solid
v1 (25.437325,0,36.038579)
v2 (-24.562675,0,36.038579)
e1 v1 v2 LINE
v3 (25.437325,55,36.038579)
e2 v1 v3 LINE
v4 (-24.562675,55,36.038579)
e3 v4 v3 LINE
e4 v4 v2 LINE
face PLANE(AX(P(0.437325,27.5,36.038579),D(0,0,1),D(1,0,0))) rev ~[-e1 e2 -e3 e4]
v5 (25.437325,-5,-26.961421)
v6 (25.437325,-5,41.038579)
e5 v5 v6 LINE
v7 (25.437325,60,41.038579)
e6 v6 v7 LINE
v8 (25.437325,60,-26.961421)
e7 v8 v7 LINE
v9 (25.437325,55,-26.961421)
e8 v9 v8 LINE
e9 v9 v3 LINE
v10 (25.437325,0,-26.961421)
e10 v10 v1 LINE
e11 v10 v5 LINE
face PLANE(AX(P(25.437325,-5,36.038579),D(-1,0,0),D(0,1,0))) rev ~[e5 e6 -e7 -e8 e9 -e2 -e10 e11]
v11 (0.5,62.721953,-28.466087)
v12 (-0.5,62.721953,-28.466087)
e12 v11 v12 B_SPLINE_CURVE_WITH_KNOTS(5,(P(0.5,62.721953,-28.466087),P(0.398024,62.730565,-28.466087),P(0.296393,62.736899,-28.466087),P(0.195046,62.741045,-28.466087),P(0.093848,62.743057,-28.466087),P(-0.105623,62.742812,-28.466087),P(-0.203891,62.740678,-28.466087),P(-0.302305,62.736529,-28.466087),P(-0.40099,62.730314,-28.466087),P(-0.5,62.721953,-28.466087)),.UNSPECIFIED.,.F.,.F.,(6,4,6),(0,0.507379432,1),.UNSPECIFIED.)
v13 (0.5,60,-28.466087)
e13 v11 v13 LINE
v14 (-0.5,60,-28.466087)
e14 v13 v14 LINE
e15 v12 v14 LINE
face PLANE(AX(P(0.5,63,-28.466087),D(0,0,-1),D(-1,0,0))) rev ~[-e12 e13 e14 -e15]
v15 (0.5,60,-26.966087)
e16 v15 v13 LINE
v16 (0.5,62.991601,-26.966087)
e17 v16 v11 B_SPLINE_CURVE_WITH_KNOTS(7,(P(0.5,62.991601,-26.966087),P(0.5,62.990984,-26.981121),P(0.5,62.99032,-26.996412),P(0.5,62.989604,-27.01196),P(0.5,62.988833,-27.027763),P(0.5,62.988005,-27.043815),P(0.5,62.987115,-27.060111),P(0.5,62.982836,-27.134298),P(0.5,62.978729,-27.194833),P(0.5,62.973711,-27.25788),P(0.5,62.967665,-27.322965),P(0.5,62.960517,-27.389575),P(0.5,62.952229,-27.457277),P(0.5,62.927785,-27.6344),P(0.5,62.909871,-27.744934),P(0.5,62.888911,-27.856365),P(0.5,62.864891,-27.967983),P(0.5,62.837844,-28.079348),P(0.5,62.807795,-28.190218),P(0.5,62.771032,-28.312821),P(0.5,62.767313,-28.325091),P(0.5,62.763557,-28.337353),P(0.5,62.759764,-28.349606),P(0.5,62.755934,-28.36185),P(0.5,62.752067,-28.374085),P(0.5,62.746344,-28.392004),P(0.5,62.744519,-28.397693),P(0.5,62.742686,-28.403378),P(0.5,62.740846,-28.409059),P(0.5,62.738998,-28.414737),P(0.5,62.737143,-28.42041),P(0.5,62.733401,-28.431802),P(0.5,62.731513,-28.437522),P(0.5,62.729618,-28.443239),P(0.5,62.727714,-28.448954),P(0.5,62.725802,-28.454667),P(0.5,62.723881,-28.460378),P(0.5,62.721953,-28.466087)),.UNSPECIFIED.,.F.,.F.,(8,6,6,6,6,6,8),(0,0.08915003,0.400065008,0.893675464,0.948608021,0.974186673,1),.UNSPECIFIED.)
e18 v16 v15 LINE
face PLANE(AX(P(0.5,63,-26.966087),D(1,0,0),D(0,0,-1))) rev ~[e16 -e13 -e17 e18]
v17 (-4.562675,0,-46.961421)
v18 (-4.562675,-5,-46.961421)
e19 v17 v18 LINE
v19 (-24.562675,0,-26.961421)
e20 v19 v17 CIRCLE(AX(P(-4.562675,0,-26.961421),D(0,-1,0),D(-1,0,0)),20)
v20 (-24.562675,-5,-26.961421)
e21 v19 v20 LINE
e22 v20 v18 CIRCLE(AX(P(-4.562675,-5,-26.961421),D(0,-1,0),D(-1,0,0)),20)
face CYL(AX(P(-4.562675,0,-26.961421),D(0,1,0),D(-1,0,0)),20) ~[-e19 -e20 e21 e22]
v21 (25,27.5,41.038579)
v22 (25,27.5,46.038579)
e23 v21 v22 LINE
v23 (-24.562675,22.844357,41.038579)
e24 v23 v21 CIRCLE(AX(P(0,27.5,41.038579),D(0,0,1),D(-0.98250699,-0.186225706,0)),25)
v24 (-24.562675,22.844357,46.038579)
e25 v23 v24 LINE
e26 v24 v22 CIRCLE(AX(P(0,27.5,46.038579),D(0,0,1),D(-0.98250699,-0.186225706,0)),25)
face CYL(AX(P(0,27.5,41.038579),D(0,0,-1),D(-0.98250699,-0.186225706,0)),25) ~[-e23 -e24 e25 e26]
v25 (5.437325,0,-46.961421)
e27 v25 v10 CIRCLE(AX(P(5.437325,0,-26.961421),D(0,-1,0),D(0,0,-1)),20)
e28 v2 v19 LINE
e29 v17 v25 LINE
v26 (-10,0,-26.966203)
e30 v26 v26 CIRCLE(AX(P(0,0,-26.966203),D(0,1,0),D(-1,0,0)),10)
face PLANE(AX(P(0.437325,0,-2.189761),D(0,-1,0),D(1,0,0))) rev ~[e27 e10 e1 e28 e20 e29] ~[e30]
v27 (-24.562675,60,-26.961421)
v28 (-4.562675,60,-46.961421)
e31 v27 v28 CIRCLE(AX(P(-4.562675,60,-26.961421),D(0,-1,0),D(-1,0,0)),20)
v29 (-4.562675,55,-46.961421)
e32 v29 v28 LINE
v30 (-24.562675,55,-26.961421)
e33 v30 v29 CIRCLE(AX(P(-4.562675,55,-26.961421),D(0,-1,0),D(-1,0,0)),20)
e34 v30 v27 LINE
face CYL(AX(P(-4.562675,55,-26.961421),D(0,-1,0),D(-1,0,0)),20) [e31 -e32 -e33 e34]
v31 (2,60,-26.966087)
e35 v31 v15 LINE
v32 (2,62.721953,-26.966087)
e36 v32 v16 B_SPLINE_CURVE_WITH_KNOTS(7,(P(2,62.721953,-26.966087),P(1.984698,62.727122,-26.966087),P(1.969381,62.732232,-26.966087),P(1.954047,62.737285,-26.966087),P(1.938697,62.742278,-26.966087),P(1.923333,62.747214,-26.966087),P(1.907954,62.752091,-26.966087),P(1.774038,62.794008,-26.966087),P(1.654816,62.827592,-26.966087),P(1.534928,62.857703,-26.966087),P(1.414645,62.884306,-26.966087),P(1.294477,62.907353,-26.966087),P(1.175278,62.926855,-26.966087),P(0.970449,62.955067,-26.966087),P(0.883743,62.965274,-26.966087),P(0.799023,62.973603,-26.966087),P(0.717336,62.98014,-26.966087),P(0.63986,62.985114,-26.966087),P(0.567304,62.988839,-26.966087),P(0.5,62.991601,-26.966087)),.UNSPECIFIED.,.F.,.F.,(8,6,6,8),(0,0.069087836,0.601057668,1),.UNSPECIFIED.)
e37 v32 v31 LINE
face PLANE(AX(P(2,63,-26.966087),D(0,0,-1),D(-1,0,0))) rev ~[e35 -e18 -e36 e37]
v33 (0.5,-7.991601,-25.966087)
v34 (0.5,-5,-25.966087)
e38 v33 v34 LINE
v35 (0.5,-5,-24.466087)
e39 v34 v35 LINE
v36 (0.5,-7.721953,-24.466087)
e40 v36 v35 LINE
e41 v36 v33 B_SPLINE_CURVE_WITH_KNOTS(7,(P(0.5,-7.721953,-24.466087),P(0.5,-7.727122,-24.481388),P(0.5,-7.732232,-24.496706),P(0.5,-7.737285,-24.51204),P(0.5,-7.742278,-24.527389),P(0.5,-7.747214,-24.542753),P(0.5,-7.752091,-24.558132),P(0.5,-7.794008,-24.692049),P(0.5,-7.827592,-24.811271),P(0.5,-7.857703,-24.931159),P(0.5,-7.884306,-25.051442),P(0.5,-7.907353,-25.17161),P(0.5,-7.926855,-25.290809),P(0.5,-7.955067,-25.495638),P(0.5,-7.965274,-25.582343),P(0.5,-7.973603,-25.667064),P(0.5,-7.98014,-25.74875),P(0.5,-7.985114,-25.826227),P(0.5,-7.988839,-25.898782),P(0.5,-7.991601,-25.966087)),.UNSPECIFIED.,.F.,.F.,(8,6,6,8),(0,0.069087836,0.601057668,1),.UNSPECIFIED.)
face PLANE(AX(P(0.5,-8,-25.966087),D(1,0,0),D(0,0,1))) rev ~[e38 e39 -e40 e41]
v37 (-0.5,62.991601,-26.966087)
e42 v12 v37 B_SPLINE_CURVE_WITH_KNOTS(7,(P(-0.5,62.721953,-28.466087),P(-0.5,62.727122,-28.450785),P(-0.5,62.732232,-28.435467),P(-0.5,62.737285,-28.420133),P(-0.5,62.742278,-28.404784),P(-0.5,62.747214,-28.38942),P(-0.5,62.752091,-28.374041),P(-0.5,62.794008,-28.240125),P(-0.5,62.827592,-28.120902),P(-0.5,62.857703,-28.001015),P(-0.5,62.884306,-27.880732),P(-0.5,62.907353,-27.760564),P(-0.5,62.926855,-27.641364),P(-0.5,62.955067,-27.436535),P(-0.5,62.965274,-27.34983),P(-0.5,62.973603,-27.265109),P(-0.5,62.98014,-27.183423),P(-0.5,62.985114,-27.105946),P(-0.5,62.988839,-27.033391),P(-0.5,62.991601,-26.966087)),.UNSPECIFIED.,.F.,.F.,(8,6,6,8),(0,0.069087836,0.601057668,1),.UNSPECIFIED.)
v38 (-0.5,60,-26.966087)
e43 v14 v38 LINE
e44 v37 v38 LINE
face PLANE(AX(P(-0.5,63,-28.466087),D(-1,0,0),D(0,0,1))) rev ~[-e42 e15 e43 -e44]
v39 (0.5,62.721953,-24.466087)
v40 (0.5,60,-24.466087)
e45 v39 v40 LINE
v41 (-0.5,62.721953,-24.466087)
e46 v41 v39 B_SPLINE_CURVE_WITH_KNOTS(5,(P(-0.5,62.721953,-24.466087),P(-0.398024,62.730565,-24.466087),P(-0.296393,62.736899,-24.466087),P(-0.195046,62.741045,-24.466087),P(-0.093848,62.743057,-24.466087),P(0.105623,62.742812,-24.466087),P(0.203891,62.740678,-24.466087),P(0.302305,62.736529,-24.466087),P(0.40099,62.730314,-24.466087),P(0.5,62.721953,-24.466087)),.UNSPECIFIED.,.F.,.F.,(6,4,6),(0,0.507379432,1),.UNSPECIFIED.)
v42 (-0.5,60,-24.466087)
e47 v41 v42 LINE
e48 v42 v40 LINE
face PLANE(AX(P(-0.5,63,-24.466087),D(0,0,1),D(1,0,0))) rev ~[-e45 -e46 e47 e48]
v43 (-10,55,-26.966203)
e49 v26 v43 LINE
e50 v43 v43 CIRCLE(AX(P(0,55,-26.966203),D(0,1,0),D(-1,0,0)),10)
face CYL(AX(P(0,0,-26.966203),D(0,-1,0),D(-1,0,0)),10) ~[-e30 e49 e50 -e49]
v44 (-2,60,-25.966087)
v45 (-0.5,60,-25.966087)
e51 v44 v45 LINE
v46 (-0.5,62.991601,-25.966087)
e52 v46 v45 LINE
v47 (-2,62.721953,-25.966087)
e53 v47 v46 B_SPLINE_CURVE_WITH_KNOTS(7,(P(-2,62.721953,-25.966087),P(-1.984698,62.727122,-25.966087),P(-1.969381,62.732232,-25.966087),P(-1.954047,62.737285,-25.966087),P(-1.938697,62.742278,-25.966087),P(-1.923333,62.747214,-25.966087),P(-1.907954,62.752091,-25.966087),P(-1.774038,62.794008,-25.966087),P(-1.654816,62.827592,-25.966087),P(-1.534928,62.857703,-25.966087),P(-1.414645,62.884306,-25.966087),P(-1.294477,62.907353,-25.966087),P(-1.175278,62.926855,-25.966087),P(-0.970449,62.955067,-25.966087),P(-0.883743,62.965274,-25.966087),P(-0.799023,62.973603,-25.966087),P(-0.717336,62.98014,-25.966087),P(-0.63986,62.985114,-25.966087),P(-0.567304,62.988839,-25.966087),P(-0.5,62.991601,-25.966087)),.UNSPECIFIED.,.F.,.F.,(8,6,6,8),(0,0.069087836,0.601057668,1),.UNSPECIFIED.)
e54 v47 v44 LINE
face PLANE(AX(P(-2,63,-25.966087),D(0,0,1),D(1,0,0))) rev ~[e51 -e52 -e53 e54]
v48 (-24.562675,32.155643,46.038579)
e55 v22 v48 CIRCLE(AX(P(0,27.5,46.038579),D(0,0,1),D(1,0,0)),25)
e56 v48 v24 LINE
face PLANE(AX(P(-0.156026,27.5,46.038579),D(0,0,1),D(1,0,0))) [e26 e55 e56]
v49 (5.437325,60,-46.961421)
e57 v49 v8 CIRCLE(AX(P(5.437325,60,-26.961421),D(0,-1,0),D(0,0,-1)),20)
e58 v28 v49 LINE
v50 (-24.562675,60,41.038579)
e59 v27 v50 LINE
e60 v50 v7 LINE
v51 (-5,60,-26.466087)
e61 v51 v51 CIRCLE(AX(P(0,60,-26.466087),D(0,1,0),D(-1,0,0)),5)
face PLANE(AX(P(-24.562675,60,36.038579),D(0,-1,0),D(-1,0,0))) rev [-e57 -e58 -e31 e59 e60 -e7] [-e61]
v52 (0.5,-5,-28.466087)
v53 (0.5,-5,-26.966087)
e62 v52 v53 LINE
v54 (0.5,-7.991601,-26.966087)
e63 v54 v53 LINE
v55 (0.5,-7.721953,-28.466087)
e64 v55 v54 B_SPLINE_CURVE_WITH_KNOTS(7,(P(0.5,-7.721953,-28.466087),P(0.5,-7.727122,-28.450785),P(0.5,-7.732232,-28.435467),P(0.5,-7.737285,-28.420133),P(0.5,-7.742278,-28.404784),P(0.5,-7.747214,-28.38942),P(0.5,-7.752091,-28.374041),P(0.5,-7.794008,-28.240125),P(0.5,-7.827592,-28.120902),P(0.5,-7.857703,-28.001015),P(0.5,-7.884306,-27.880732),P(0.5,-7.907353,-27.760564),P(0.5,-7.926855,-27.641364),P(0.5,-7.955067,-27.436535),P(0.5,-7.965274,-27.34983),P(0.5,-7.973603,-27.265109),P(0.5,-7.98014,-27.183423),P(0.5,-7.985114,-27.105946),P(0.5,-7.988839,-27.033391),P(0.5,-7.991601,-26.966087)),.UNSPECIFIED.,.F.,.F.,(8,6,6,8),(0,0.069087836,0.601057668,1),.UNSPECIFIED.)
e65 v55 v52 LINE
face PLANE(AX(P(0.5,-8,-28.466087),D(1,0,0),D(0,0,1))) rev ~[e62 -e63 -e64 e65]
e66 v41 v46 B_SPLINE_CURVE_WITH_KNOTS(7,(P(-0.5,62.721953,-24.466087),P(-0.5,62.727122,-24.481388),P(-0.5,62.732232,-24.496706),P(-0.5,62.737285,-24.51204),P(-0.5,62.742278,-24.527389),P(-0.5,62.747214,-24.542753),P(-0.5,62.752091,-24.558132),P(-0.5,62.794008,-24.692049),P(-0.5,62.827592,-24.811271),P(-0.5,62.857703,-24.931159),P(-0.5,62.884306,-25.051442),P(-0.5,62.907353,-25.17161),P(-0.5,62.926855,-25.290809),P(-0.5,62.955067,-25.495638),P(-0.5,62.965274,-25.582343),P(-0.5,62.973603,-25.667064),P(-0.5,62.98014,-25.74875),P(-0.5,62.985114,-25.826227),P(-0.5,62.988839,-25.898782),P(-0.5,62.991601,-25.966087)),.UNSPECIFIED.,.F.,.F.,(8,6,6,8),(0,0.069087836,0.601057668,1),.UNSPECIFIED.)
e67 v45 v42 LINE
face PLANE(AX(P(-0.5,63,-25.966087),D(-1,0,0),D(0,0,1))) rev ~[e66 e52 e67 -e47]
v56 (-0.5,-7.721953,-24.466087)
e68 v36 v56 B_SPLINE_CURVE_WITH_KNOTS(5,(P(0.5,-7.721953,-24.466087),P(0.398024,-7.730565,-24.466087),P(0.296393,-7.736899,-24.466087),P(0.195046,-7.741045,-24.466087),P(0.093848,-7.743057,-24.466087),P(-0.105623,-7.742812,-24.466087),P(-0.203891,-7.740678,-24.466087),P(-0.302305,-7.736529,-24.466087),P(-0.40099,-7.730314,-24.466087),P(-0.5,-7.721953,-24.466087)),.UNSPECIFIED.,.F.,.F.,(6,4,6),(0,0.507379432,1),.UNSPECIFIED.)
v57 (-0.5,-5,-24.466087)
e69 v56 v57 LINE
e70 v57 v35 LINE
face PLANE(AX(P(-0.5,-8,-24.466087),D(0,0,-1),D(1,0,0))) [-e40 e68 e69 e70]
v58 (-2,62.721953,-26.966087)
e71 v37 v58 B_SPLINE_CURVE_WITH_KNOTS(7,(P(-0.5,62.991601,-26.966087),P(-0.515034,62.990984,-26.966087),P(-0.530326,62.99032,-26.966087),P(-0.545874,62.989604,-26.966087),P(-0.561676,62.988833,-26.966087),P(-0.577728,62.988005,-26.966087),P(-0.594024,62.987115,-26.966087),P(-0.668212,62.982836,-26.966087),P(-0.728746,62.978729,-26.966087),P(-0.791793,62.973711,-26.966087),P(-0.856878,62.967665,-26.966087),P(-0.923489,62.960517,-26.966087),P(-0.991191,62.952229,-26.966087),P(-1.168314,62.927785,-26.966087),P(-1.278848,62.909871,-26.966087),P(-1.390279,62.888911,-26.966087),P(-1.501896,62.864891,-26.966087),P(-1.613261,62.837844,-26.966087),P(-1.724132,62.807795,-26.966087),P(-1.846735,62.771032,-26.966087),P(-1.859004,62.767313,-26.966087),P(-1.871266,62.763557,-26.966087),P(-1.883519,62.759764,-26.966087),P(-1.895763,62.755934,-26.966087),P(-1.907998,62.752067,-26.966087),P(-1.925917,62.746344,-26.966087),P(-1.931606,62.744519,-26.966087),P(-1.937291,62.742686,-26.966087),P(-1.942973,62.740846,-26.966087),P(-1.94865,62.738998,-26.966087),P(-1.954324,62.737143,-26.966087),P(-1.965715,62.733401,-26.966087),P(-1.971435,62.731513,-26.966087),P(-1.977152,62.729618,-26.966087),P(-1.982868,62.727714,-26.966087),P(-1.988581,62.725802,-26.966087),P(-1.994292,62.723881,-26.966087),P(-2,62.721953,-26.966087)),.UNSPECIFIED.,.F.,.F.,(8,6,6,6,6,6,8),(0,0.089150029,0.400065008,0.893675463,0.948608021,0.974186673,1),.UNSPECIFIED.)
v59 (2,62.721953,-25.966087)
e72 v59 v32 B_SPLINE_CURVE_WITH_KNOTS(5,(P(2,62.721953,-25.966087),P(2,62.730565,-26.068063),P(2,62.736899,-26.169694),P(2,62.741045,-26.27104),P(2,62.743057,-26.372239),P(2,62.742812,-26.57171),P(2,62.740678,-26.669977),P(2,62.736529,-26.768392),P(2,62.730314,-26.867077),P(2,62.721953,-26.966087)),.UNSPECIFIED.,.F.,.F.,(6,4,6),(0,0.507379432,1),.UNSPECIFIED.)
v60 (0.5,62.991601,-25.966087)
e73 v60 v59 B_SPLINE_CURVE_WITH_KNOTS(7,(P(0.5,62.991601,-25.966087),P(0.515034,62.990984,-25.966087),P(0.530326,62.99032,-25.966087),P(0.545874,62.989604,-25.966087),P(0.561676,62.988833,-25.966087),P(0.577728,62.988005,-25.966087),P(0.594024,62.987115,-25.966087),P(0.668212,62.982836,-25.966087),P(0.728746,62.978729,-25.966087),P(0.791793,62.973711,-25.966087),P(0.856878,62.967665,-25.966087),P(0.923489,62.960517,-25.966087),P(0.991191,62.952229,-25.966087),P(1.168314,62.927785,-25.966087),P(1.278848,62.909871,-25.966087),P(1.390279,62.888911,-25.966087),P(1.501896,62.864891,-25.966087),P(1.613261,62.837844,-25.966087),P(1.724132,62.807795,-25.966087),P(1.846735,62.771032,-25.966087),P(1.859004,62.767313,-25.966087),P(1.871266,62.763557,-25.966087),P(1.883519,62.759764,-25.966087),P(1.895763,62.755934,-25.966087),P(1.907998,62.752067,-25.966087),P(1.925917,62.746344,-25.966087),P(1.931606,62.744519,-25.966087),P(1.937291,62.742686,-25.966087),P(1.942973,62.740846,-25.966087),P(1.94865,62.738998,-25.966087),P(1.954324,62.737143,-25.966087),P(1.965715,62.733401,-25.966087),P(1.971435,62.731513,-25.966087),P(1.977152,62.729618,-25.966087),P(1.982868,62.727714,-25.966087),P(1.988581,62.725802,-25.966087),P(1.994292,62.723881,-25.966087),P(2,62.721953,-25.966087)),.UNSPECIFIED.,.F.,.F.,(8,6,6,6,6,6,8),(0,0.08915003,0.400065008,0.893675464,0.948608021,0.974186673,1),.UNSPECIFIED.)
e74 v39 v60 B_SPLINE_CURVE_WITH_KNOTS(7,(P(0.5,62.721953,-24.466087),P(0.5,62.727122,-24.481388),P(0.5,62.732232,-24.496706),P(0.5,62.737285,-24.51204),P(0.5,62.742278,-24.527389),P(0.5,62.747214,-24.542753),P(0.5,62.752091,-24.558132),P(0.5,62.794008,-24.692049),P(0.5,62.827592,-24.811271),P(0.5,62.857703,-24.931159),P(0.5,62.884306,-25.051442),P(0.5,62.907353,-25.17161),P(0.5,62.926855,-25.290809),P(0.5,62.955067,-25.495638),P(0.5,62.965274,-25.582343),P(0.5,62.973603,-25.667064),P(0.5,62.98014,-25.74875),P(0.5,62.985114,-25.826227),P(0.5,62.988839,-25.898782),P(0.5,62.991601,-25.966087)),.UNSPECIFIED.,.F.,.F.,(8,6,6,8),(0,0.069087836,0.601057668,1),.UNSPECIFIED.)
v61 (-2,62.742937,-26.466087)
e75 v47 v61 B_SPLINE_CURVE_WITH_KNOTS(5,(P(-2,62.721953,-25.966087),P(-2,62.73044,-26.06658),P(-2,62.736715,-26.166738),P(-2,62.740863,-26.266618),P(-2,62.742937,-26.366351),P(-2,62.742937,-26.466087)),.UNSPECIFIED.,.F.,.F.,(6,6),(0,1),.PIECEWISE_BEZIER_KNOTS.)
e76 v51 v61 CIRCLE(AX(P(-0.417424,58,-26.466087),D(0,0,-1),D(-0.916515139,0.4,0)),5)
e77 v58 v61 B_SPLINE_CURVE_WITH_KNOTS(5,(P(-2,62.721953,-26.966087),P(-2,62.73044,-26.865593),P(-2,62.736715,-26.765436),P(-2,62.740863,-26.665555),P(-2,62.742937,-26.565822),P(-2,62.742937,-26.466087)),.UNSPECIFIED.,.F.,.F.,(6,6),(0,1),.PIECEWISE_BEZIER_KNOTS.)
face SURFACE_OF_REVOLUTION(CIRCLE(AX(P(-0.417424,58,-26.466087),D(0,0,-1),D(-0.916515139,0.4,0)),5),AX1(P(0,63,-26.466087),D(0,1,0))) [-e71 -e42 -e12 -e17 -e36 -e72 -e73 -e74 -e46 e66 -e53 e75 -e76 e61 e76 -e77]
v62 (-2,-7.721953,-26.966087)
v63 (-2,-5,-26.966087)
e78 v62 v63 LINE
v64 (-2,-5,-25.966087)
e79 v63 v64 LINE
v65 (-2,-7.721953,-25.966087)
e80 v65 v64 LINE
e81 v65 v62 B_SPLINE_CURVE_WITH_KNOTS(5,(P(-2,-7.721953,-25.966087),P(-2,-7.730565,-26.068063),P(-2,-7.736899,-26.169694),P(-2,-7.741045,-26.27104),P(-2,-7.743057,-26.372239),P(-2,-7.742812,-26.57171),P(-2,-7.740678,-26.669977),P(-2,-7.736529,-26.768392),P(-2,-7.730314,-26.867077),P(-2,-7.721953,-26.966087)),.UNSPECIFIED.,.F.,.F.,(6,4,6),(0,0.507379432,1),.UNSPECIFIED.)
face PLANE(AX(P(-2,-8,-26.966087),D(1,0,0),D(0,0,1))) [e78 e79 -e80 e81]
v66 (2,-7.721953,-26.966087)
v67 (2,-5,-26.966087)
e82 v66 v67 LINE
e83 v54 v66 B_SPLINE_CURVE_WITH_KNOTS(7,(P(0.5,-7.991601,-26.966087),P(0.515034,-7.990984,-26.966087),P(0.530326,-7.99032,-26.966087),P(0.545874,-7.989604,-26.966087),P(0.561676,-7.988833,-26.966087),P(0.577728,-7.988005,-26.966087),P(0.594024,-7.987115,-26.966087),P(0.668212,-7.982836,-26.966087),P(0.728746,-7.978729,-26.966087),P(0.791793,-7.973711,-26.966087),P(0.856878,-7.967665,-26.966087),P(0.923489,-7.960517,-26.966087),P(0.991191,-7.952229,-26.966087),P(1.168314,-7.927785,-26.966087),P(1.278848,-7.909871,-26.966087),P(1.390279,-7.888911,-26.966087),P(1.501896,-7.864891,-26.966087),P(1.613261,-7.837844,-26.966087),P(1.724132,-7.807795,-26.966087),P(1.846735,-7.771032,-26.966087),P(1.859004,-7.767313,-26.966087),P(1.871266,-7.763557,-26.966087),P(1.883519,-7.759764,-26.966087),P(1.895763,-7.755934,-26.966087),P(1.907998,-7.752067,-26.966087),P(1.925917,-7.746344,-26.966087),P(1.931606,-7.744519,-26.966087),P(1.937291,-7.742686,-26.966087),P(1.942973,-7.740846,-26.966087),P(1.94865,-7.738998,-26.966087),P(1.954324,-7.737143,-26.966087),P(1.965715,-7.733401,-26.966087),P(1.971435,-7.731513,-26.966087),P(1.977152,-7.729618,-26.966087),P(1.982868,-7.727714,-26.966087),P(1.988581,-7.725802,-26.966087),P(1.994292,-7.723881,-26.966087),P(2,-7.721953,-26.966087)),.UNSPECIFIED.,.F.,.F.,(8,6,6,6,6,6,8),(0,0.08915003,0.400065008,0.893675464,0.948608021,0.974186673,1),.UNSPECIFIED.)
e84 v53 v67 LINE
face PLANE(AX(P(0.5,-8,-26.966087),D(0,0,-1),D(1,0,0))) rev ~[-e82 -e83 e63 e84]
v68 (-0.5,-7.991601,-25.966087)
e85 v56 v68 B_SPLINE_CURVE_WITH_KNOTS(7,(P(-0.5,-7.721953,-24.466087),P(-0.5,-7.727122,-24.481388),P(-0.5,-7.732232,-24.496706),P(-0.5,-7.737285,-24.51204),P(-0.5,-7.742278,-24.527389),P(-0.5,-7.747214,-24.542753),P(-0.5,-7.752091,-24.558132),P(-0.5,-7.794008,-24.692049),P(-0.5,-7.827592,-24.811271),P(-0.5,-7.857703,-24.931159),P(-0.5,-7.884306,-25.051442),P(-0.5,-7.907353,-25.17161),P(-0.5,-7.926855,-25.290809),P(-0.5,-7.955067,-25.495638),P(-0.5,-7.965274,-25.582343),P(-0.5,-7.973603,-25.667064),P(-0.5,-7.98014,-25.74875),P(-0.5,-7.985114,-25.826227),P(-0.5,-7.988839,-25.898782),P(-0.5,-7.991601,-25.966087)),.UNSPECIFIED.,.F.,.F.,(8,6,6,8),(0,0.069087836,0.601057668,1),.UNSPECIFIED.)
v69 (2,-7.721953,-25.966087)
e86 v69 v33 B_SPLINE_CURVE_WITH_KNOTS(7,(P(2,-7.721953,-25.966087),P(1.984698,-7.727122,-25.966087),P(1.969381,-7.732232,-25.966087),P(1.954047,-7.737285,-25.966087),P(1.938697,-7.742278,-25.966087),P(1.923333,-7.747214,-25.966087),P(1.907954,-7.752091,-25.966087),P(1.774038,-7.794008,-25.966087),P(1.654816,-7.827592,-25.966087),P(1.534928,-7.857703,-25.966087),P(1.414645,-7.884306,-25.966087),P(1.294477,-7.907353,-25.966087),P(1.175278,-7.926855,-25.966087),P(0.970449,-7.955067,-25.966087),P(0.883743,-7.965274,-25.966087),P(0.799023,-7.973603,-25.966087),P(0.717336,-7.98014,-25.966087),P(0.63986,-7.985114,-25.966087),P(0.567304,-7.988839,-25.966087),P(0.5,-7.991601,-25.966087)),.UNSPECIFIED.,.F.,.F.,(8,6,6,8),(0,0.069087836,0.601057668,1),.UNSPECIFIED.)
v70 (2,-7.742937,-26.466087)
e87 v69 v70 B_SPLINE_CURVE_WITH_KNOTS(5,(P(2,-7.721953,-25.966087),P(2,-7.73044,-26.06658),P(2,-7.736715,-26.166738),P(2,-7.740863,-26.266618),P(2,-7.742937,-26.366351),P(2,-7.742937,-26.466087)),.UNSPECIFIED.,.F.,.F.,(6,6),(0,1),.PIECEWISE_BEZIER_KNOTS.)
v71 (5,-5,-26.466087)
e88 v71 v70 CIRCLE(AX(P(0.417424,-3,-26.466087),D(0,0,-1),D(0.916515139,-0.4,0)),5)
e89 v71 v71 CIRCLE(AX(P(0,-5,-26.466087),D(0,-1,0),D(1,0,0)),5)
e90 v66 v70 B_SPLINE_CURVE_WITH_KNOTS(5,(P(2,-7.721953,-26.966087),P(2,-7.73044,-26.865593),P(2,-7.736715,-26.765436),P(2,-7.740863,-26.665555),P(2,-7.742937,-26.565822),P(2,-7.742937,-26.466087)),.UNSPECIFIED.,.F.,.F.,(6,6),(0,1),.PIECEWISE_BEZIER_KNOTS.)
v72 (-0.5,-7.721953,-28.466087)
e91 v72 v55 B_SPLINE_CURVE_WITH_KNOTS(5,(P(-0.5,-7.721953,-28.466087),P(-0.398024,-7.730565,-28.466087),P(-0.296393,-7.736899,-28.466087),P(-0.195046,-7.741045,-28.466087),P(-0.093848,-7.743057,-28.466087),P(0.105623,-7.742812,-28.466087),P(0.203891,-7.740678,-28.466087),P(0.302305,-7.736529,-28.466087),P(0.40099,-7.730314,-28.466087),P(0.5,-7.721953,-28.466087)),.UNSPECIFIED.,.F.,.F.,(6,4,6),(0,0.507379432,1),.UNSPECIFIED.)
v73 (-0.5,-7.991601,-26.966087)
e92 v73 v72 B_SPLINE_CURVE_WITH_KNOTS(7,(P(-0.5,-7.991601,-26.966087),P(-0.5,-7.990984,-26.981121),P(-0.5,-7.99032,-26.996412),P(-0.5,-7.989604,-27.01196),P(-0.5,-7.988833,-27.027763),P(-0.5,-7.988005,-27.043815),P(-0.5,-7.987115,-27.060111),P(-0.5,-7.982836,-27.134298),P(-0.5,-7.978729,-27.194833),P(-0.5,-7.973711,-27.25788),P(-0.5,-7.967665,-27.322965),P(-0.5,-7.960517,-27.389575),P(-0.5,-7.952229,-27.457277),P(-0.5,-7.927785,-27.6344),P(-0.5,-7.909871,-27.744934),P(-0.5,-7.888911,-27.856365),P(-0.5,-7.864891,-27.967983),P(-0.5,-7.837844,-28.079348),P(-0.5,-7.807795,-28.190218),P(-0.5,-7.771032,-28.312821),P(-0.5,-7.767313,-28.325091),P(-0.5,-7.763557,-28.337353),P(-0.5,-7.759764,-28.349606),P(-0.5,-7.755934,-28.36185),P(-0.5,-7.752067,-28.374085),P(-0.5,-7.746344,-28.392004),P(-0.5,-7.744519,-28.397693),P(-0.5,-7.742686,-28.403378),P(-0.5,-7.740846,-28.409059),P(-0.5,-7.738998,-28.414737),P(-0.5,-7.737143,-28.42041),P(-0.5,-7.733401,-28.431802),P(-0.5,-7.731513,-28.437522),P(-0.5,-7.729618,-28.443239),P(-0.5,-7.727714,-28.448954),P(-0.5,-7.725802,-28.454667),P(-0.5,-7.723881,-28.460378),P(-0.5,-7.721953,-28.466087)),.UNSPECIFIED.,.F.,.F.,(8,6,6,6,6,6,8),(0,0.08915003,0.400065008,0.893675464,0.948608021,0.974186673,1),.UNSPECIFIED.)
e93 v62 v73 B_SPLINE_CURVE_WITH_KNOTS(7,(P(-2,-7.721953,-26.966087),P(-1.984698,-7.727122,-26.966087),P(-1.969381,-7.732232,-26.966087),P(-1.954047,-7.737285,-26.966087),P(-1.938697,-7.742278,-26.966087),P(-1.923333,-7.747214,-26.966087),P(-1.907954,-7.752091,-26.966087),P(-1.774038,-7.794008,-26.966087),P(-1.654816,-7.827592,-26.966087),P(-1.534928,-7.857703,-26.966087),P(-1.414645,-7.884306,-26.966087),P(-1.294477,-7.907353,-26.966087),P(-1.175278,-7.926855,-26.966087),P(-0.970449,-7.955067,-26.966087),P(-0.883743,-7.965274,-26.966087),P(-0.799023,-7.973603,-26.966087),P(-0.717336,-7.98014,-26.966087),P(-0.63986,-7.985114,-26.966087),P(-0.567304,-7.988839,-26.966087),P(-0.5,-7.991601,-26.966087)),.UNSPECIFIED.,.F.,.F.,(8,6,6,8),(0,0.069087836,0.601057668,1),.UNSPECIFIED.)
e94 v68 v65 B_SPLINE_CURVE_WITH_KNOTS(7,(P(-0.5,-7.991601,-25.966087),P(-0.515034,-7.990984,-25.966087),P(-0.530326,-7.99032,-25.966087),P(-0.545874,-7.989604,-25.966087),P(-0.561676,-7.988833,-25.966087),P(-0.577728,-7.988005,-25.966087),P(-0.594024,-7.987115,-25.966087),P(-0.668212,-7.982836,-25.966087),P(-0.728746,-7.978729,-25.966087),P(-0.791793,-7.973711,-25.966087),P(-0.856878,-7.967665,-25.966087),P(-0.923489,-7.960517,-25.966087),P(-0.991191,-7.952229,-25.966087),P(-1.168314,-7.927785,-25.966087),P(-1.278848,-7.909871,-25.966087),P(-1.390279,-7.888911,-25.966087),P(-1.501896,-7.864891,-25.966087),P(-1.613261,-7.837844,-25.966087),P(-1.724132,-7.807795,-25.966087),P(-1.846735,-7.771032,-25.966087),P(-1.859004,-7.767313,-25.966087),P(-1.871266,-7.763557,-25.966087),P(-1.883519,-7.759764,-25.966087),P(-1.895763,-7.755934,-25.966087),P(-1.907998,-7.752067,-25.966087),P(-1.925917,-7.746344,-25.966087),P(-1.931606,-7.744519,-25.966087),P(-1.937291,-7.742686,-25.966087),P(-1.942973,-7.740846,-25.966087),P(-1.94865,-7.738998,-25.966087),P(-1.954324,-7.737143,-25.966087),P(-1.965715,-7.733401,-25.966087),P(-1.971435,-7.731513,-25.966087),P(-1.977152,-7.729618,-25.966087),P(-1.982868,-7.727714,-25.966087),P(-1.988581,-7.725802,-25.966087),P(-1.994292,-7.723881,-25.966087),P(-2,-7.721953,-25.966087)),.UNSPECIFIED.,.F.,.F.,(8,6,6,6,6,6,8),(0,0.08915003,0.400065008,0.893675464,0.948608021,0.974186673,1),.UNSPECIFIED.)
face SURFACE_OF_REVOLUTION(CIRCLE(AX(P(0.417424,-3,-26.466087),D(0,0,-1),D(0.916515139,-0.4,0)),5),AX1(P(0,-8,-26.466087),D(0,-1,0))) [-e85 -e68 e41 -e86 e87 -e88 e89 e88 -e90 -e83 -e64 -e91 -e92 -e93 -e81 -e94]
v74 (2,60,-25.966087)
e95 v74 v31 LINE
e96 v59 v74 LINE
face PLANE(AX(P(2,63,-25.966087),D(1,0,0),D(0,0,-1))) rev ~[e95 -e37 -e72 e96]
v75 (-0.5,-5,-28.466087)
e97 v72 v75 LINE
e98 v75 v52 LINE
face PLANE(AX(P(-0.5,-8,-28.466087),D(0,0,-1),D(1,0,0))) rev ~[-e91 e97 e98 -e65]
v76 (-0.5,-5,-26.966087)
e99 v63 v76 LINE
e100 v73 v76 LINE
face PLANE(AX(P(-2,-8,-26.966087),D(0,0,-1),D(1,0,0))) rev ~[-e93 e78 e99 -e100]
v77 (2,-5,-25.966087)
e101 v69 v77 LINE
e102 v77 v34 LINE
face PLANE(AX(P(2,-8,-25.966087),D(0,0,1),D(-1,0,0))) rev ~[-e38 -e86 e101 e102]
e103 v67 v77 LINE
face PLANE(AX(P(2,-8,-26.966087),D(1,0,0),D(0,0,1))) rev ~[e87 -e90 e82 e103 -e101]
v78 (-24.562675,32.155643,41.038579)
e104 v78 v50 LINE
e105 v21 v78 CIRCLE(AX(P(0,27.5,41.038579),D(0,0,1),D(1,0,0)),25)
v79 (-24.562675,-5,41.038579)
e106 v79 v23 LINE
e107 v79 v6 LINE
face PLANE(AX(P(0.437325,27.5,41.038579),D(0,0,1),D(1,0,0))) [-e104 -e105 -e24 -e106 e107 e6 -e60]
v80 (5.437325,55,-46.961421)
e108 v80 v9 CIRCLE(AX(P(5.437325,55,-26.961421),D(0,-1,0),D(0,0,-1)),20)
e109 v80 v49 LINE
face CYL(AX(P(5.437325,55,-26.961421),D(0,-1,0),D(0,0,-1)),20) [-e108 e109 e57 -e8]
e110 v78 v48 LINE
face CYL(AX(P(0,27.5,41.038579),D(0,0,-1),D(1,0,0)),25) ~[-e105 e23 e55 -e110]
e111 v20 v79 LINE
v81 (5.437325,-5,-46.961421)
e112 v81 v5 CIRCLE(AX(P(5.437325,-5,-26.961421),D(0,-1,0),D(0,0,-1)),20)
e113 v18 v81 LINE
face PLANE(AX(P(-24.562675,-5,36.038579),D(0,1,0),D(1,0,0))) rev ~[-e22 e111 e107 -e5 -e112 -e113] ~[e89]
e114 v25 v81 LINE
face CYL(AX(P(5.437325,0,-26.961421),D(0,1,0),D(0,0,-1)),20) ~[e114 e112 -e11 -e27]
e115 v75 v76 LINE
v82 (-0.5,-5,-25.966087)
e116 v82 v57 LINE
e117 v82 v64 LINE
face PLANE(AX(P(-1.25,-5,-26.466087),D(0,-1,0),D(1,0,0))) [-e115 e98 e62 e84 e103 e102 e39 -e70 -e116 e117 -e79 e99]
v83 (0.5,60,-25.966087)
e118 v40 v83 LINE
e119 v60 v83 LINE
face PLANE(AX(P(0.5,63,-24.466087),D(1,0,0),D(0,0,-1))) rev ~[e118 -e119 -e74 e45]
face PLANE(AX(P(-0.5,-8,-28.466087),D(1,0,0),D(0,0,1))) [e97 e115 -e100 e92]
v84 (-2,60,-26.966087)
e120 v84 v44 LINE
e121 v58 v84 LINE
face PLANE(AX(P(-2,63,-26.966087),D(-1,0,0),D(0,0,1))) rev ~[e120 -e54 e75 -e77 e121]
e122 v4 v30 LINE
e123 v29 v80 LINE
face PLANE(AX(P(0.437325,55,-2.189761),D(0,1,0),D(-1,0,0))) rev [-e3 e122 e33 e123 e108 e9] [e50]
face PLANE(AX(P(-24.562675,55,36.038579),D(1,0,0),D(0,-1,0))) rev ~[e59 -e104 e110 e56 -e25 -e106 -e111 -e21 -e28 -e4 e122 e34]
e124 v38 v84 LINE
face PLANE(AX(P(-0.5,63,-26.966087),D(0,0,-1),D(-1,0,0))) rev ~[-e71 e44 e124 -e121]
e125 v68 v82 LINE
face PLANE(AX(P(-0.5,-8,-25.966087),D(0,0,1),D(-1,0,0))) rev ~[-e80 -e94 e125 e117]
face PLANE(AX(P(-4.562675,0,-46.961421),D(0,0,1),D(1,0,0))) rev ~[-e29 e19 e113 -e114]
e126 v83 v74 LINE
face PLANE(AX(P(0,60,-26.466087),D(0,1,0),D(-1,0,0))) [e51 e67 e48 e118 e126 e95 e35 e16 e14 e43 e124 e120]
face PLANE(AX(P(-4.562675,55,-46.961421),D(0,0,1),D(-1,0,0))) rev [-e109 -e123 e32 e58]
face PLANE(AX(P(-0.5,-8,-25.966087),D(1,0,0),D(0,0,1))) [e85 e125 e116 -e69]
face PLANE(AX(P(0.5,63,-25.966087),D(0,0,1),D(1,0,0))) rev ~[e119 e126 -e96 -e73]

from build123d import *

# Parameters (mm, degrees)
F1_DEPTH  = 5
F2_W      = 50
F2_H      = 55
F2_H_2    = 5
F3_DEPTH  = 5
F7_DEPTH  = 5
F8_R      = 10
F9_DEPTH  = 55
F10_R     = 5
F11_DEPTH = 3
F12_W     = 1.5
F12_H     = 1
F12_W_2   = 1
F12_H_2   = 1.5
F14_DEPTH = 3
F15_R     = 5
F16_DEPTH = 3
F18_DEPTH = 3


# Not quite as in the source:
# - a fillet or chamfer that OpenCascade refuses, or shapes differently, is made with other operations: its cross-section is extruded or revolved along the edge and cut away or added


with BuildPart() as f1:
    # F0 (on Front) → F1 (new body)
    with BuildSketch(Plane.XZ):
        with BuildLine():
            Line((25.4373252392, 36.0385786295), (-24.5626747608, 36.0385786295))
            Line((-24.5626747608, 36.0385786295), (-24.5626747608, -26.9614213705))
            ThreePointArc((-24.5626747608, -26.9614213705), (-18.7048103845, -41.1035569942), (-4.5626747608, -46.9614213705))
            Line((-4.5626747608, -46.9614213705), (5.4373252392, -46.9614213705))
            ThreePointArc((5.4373252392, -46.9614213705), (19.5794608629, -41.1035569942), (25.4373252392, -26.9614213705))
            Line((25.4373252392, -26.9614213705), (25.4373252392, 36.0385786295))
        make_face()
    extrude(amount=F1_DEPTH)

    # F2 (on face) → F3 (join)
    with BuildSketch(Plane.XY.offset(36.0385786295)):
        with Locations((0.4373252392, 27.5)):
            Rectangle(F2_W, F2_H)
        with Locations((0.4373252392, -2.5)):
            Rectangle(F2_W, F2_H_2)
    extrude(amount=F3_DEPTH)

    # F5: F1 across plane


with BuildPart() as f1_1:
    add(f1.part)
    add(f1.part.mirror(Plane(origin=(0.4373252392, 27.5, -3.8633044256), x_dir=(1, 0, 0), z_dir=(0, 1, 0))))

    # F6 (on face) → F7 (join)
    with BuildSketch(Plane.XY.offset(41.0385786295)):
        with BuildLine():
            ThreePointArc((-24.5626747608, 22.8443573382), (2.3380687521, 2.6095714278), (25, 27.5))
            ThreePointArc((25, 27.5), (2.3380687521, 52.3904285722), (-24.5626747608, 32.1556426618))
            Line((-24.5626747608, 32.1556426618), (-24.5626747608, 22.8443573382))
        make_face()
    extrude(amount=F7_DEPTH)

    # F8 (on face) → F9 (join, through all)
    with BuildSketch(Plane(origin=(0, 0, 0), x_dir=(-1, 0, 0), z_dir=(0, 1, 0))):
        with Locations((0, -26.9662032763)):
            Circle(F8_R)
    extrude(amount=F9_DEPTH)

    # F10 (on face) → F11 (join)
    with BuildSketch(Plane.XZ.offset(5)):
        with Locations((0, -26.4660866176)):
            Circle(F10_R)
    extrude(amount=F11_DEPTH)

    # F13: fillet of radius 5 on 1 edges, made by hand

    # F13_s1 → F13_t2 (revolve, cut)
    with BuildSketch(Plane.XY.offset(-26.4660866176)):
        with BuildLine():
            ThreePointArc((5, -5), (3.1560370926, -7.1833001327), (0.417424305, -8))
            Line((0.417424305, -8), (5, -8))
            Line((5, -8), (5, -5))
        make_face()
    revolve(axis=Axis((0, -8, -26.4660866176), (0, -1, 0)), mode=Mode.SUBTRACT)

    # F12 (on face) → F14 (cut)
    with BuildSketch(Plane.XZ.offset(8)):
        with Locations((-1.25, -26.4660866176)):
            Rectangle(F12_W, F12_H)
        Polygon((1, -25.9660866176), (0.5, -25.9660866176), (0.5, -26.9660866176), (1, -26.9660866176), (2, -26.9660866176), (2, -25.9660866176), align=None)
        with Locations((0, -26.4660866176)):
            Rectangle(F12_W_2, F12_H)
        with Locations((0, -25.2160866176)):
            Rectangle(F12_W_2, F12_H_2)
        with Locations((0, -27.7160866176)):
            Rectangle(F12_W_2, F12_H_2)
    extrude(amount=-F14_DEPTH, mode=Mode.SUBTRACT)

    # F15 (on face) → F16 (join)
    with BuildSketch(Plane(origin=(0, 60, 0), x_dir=(-1, 0, 0), z_dir=(0, 1, 0))):
        with Locations((0, -26.4660866176)):
            Circle(F15_R)
    extrude(amount=F16_DEPTH)

    # F17 (on face) → F18 (cut)
    with BuildSketch(Plane(origin=(0, 63, 0), x_dir=(-1, 0, 0), z_dir=(0, 1, 0))):
        Polygon((0.5, -24.4660866176), (-0.5, -24.4660866176), (-0.5, -25.9660866176), (-2, -25.9660866176), (-2, -26.9660866176), (-0.5, -26.9660866176), (-0.5, -28.4660866176), (0.5, -28.4660866176), (0.5, -26.9660866176), (2, -26.9660866176), (2, -25.9660866176), (0.5, -25.9660866176), align=None)
    extrude(amount=-F18_DEPTH, mode=Mode.SUBTRACT)

    # F19: fillet of radius 5 on 1 edges, made by hand

    # F19_s1 → F19_t2 (revolve, cut)
    with BuildSketch(Plane.XY.offset(-26.4660866176)):
        with BuildLine():
            ThreePointArc((-5, 60), (-3.1560370926, 62.1833001327), (-0.417424305, 63))
            Line((-0.417424305, 63), (-5, 63))
            Line((-5, 63), (-5, 60))
        make_face()
    revolve(axis=Axis((0, 63, -26.4660866176), (0, 1, 0)), mode=Mode.SUBTRACT)


solid = f1_1.part
